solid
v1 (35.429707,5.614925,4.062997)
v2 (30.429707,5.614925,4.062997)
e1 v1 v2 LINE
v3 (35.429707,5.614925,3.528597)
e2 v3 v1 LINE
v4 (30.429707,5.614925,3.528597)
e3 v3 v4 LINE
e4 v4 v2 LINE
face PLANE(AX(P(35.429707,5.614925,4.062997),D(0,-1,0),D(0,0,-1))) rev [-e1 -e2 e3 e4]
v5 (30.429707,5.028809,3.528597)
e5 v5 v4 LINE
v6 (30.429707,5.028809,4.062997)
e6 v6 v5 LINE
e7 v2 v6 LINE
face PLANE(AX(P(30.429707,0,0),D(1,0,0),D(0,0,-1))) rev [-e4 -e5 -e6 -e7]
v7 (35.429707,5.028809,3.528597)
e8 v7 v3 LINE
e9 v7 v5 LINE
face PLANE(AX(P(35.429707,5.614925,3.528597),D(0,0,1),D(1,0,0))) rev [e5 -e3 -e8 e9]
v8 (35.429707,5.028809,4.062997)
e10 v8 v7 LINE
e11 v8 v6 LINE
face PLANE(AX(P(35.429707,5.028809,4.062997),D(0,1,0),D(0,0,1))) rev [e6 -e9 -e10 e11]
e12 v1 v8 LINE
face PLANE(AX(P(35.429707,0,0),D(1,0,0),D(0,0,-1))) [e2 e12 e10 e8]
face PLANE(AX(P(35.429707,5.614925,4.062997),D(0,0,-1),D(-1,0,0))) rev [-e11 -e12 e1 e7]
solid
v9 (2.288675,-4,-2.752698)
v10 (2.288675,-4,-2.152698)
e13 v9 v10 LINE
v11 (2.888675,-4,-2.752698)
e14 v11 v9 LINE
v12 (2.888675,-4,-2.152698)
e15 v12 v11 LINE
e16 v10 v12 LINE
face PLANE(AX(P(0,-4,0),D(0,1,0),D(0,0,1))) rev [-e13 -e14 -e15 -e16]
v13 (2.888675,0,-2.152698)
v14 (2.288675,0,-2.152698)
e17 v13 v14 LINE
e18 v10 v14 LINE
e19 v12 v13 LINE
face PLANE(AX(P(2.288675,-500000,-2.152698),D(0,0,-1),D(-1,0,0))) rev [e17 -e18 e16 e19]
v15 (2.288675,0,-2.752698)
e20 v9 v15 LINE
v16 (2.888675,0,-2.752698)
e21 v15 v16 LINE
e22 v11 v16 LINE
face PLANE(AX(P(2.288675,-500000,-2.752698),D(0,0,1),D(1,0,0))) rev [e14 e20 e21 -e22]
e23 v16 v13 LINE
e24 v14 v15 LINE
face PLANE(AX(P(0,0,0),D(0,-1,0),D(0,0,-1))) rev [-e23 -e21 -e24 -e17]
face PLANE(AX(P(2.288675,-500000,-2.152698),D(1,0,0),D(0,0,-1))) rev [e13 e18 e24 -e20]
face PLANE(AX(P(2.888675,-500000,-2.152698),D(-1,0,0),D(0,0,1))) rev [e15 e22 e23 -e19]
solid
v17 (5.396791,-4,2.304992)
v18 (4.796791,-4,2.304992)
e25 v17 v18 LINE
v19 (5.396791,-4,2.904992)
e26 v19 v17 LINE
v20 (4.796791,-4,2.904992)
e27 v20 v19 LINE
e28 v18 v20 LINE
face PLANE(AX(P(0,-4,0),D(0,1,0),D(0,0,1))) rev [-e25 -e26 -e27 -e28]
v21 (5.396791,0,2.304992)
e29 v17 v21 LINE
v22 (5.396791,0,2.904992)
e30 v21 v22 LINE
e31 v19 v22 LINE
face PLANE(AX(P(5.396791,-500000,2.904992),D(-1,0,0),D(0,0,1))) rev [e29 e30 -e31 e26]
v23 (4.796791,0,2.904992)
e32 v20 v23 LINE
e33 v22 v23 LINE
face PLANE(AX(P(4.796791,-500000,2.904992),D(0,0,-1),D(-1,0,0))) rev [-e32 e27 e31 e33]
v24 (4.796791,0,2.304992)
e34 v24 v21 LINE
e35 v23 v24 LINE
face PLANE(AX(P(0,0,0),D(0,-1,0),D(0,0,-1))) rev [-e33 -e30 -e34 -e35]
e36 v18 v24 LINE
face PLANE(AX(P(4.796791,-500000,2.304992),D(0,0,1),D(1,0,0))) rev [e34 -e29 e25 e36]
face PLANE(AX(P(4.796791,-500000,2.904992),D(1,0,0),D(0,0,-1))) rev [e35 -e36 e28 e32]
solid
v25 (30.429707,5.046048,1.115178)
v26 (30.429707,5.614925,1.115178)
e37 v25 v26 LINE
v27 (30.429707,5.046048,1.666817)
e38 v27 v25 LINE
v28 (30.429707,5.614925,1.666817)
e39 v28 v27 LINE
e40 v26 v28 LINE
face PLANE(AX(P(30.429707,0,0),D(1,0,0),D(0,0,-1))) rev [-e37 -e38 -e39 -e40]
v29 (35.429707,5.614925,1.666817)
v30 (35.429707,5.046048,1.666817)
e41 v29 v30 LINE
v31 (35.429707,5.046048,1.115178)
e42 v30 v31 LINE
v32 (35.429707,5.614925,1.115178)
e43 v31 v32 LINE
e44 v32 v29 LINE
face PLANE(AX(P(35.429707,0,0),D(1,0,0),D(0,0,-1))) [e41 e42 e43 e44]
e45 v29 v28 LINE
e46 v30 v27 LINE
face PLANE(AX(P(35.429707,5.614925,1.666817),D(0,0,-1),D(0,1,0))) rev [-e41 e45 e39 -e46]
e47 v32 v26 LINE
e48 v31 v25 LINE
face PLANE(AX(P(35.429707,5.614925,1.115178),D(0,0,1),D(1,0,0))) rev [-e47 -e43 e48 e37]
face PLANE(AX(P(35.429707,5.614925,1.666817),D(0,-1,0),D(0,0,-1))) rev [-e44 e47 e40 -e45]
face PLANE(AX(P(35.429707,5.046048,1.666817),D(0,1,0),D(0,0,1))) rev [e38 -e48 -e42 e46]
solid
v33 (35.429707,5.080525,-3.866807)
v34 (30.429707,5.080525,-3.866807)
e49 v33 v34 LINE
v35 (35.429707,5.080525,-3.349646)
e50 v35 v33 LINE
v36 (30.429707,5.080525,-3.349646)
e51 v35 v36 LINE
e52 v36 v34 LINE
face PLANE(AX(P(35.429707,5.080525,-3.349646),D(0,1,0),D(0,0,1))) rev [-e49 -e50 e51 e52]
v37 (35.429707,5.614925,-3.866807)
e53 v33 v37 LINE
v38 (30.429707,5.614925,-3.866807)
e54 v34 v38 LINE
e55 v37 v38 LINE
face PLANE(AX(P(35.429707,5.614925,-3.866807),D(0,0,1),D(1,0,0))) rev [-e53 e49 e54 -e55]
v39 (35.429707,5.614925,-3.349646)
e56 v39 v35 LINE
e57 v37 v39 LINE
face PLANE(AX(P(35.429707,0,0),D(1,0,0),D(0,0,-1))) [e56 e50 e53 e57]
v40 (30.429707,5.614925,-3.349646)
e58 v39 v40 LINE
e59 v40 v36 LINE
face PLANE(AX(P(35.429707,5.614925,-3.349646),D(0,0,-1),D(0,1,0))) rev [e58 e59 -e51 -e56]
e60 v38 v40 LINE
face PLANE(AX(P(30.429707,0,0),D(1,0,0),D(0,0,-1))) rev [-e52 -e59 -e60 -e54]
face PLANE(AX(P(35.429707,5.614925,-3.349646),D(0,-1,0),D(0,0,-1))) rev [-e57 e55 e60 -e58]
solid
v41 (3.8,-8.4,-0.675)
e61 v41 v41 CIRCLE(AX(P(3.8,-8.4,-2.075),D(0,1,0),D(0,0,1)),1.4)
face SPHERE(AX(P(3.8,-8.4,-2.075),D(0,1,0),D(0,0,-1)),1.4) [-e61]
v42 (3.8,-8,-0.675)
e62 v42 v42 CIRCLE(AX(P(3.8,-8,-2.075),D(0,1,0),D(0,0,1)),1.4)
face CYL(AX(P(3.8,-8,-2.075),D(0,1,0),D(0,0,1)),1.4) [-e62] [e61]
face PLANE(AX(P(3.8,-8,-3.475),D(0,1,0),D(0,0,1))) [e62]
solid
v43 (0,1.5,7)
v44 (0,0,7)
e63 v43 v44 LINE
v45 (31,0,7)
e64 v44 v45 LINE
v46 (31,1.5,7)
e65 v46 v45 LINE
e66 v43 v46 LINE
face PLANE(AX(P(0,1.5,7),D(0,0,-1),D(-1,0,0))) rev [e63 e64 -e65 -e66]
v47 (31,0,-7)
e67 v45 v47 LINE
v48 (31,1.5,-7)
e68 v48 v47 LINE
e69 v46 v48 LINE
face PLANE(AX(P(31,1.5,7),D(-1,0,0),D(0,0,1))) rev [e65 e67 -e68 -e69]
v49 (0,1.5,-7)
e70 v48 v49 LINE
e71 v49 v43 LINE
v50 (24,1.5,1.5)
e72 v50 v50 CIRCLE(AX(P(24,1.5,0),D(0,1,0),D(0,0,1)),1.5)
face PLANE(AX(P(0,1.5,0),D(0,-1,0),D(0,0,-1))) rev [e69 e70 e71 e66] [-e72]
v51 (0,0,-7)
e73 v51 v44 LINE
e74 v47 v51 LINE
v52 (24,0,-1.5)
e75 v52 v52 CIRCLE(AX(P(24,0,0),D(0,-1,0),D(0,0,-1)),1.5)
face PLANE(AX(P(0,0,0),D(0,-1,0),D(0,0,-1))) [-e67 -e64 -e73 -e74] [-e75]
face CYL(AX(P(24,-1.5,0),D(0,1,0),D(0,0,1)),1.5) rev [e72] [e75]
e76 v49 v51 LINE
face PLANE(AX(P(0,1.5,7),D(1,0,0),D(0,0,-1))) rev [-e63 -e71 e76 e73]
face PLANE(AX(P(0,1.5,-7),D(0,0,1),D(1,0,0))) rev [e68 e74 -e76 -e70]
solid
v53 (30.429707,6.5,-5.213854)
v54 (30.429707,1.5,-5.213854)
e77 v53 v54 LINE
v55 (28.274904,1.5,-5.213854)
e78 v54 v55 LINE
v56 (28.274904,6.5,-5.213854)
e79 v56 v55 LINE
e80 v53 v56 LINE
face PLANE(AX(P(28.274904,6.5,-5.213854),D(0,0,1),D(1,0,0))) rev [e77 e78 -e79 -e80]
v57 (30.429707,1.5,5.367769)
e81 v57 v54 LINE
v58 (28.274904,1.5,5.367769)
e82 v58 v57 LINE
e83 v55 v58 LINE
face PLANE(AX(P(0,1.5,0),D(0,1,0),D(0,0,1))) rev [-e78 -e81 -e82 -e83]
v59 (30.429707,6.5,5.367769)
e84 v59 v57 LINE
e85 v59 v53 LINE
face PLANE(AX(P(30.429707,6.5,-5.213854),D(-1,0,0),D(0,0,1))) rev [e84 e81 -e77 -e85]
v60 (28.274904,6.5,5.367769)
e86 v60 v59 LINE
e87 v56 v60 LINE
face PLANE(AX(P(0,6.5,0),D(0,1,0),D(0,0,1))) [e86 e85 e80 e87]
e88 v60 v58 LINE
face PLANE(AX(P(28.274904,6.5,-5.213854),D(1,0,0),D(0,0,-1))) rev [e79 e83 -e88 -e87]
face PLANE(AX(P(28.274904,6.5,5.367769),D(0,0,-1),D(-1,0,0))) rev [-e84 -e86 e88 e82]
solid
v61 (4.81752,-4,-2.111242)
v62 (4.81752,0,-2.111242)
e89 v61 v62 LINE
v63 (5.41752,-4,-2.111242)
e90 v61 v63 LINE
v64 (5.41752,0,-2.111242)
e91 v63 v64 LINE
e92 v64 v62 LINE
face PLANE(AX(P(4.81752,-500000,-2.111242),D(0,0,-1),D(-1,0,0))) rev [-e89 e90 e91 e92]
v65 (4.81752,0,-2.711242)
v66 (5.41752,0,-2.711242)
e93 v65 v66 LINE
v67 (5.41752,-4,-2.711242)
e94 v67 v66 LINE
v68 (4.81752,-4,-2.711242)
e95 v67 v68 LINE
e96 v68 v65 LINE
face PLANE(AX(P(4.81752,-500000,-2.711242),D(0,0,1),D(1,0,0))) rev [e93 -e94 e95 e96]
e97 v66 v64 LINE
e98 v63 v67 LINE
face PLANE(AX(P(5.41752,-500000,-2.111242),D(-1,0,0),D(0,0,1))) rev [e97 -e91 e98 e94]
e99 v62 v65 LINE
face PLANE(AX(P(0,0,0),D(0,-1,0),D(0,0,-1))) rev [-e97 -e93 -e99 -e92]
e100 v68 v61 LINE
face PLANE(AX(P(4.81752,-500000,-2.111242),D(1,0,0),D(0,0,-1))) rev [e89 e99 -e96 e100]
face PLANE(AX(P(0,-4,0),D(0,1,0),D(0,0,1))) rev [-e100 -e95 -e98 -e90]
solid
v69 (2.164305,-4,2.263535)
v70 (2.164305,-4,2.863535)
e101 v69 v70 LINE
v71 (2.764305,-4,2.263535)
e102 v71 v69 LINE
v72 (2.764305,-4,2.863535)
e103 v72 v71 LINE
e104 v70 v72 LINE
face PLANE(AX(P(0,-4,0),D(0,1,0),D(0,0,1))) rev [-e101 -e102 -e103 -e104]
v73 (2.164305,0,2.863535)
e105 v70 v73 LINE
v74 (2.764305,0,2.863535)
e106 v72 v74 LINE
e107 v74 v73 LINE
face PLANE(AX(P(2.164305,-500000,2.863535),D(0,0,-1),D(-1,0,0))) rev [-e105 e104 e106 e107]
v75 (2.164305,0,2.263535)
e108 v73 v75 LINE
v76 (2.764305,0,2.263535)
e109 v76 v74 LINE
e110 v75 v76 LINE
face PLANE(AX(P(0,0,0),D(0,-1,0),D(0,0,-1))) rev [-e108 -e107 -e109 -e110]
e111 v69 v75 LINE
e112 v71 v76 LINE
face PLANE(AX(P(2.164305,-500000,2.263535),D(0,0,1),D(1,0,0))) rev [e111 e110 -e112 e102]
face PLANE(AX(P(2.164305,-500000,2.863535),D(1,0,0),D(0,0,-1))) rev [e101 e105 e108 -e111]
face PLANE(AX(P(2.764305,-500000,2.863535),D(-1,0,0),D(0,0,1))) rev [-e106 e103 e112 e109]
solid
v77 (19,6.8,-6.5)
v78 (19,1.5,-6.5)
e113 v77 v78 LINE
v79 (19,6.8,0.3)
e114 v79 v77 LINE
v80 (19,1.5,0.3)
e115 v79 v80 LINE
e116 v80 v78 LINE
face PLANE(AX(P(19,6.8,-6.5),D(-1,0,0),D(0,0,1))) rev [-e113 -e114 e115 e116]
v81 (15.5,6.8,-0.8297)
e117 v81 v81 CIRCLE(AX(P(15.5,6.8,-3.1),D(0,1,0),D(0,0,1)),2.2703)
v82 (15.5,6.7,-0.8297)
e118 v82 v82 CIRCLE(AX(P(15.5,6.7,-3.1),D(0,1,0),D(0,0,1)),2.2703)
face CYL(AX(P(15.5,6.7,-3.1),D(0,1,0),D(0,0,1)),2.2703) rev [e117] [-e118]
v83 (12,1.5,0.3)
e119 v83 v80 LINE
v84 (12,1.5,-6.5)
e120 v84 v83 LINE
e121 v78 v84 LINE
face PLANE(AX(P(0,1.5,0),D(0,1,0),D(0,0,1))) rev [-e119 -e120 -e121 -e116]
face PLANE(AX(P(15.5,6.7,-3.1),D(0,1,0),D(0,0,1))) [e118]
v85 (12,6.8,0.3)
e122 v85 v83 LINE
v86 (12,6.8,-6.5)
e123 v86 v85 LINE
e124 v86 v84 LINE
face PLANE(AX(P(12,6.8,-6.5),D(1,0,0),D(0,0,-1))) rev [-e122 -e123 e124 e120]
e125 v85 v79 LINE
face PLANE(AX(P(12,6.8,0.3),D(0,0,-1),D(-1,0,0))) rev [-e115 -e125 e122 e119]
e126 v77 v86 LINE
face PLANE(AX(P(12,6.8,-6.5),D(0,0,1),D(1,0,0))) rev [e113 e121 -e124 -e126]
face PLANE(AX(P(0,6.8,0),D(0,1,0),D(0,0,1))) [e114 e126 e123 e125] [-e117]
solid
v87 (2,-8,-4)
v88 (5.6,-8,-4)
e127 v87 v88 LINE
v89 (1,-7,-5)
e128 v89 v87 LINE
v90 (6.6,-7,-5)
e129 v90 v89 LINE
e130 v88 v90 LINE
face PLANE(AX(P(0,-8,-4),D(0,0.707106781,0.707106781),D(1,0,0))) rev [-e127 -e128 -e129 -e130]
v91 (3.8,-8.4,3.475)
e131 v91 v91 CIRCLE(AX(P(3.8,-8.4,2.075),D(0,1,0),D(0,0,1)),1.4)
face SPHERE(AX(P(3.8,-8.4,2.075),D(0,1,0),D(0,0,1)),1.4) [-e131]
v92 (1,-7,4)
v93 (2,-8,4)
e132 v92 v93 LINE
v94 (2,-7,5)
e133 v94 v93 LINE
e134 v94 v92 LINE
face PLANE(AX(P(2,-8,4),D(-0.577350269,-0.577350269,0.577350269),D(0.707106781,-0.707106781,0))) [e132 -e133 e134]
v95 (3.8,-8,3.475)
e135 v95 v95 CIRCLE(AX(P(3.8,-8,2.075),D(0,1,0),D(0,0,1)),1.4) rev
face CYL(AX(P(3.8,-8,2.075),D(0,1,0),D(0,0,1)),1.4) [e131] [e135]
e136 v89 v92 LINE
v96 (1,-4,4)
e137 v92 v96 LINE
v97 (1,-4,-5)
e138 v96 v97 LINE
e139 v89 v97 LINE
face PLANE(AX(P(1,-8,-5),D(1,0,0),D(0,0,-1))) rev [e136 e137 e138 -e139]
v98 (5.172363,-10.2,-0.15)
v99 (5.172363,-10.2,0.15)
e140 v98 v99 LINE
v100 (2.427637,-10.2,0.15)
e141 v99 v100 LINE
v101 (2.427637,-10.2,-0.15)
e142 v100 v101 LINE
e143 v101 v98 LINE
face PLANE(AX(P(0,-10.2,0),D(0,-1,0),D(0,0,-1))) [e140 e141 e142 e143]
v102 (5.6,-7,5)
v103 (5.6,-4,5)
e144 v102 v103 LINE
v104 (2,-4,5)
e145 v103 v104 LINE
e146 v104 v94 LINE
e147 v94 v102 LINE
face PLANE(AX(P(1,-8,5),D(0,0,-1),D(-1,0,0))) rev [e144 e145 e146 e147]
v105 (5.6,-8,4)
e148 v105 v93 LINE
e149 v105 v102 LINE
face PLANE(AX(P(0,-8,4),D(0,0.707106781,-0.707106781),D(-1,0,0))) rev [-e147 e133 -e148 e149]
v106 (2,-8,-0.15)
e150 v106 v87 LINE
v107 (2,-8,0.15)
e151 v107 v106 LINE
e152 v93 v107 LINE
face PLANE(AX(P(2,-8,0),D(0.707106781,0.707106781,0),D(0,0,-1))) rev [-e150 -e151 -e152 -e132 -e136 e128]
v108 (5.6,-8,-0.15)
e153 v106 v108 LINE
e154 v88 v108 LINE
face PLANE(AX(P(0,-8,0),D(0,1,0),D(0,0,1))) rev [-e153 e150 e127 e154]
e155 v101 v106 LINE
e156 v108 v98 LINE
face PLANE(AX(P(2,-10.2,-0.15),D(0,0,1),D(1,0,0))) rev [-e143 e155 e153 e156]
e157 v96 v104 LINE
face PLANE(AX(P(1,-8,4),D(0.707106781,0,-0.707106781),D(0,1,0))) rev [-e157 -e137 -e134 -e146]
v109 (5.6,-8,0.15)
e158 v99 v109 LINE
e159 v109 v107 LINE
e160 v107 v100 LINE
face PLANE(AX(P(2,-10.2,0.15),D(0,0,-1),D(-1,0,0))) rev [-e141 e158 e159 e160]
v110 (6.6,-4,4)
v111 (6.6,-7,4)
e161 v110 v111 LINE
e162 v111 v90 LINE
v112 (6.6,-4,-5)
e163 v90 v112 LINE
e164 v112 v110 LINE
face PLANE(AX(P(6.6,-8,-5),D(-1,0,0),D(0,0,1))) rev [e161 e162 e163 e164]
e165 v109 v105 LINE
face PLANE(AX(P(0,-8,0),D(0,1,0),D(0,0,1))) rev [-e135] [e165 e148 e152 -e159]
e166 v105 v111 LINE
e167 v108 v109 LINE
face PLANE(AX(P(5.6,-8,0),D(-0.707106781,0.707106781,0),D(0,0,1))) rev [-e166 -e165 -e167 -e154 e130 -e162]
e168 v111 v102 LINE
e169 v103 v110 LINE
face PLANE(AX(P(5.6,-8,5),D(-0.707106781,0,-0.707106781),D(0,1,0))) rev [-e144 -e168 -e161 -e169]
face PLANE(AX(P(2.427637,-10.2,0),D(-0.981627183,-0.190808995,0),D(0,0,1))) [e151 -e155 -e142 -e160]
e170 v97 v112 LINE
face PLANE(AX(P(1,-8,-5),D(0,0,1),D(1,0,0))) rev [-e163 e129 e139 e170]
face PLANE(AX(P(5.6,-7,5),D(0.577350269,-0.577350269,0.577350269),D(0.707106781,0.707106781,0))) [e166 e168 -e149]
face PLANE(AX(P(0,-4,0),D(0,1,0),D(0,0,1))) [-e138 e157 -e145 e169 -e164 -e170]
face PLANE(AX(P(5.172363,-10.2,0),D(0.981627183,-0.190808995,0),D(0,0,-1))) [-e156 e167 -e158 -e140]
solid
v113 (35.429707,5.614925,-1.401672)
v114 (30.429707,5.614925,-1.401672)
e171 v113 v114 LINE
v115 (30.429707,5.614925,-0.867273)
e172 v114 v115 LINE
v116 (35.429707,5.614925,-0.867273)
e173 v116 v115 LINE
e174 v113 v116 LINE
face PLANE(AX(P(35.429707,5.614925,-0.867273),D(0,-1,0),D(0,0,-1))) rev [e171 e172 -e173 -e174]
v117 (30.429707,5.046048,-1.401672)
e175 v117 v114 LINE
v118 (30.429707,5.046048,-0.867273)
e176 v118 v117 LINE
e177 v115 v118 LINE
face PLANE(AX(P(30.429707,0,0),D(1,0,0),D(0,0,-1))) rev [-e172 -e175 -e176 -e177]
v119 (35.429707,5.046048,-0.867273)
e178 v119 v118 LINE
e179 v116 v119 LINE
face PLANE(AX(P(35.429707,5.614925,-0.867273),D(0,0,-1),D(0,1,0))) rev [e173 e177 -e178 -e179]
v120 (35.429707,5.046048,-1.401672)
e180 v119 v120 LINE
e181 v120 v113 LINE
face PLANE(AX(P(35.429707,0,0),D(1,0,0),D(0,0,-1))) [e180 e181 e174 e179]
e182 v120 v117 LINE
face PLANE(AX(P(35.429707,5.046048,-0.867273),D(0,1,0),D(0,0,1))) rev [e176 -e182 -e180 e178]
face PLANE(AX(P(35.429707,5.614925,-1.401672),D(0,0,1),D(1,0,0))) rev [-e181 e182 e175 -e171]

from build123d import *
from OCP.BRepFilletAPI import BRepFilletAPI_MakeChamfer

# Parameters (mm, degrees)
SKETCH_1_W          = 31
SKETCH_1_H          = 14
EXTRUDE_1_DEPTH     = 1.5
SKETCH_2_W          = 7
SKETCH_2_H          = 6.8
EXTRUDE_2_DEPTH     = 5.3
SKETCH_3_W          = 2.154803144
SKETCH_3_H          = 10.581622582
EXTRUDE_3_DEPTH     = 5
SKETCH_5_W          = 0.534399799
SKETCH_5_H          = 0.586115909
EXTRUDE_4_DEPTH     = 5
SKETCH_5_W_2        = 0.551638502
SKETCH_5_H_2        = 0.568877205
EXTRUDE_4_2_DEPTH   = 5
EXTRUDE_4_3_DEPTH   = 5
SKETCH_5_W_3        = 0.517161096
SKETCH_5_H_3        = 0.534399799
EXTRUDE_4_4_DEPTH   = 5
EXTRUDE_START       = 4
SKETCH_6_W          = 5.6
SKETCH_6_H          = 10
EXTRUDE_5_DEPTH     = 4
EXTRUDE_6_REACH     = 38.99
SKETCH_7_W          = 0.6
SKETCH_7_H          = 0.6
CHAMFER_1_SIZE      = 1
SKETCH_8_R          = 1.5
CUT_EXTRUDE_1_DEPTH = 3
SKETCH_9_W          = 3.6
SKETCH_9_H          = 0.3
EXTRUDE_7_DEPTH     = 2.2
CHAMFER_2_SIZE      = 2.2
CHAMFER_2_SIZE_2    = 0.42763668
SKETCH_12_R         = 2.270300466
CUT_EXTRUDE_2_DEPTH = 0.1


with BuildPart() as part:
    # 草圖1 → 填料-伸長1 (new body)
    with BuildSketch(Plane(origin=(0, 0, 0), x_dir=(1, 0, 0), z_dir=(0, 1, 0))):
        with Locations((15.5, 0)):
            Rectangle(SKETCH_1_W, SKETCH_1_H)
    extrude(amount=EXTRUDE_1_DEPTH)

    # 草圖8 → 除料-伸長1 (cut)
    with BuildSketch(Plane(origin=(0, 1.5, 0), x_dir=(1, 0, 0), z_dir=(0, 1, 0))):
        with Locations(Location((24, 0, 0), (0, 0, 270))):
            Circle(SKETCH_8_R)
    extrude(amount=-CUT_EXTRUDE_1_DEPTH, mode=Mode.SUBTRACT)


with BuildPart() as body_2:
    # 草圖2 → 填料-伸長2 (new body)
    with BuildSketch(Plane(origin=(0, 1.5, 0), x_dir=(1, 0, 0), z_dir=(0, 1, 0))):
        with Locations((15.5, 3.1)):
            Rectangle(SKETCH_2_W, SKETCH_2_H)
    extrude(amount=EXTRUDE_2_DEPTH)

    # 草圖12 → 除料-伸長2 (cut)
    with BuildSketch(Plane(origin=(0, 6.8, 0), x_dir=(1, 0, 0), z_dir=(0, 1, 0))):
        with Locations(Location((15.5, 3.1, 0), (0, 0, 270))):
            Circle(SKETCH_12_R)
    extrude(amount=-CUT_EXTRUDE_2_DEPTH, mode=Mode.SUBTRACT)


with BuildPart() as body_3:
    # 草圖3 → 填料-伸長3 (new body)
    with BuildSketch(Plane(origin=(0, 1.5, 0), x_dir=(1, 0, 0), z_dir=(0, 1, 0))):
        with Locations((29.352305926, -0.076957255)):
            Rectangle(SKETCH_3_W, SKETCH_3_H)
    extrude(amount=EXTRUDE_3_DEPTH)


with BuildPart() as body_4:
    # 草圖5 → 填料-伸長4 (new body)
    with BuildSketch(Plane(origin=(30.429707498, 0, 0), x_dir=(0, 0, -1), z_dir=(1, 0, 0))):
        with Locations((-3.795796662, 5.3218671)):
            Rectangle(SKETCH_5_W, SKETCH_5_H)
    extrude(amount=EXTRUDE_4_DEPTH)


with BuildPart() as body_5:
    # 草圖5 → Extrude 4 2 (new body)
    with BuildSketch(Plane(origin=(30.429707498, 0, 0), x_dir=(0, 0, -1), z_dir=(1, 0, 0))):
        with Locations((-1.390997567, 5.330486452)):
            Rectangle(SKETCH_5_W_2, SKETCH_5_H_2)
    extrude(amount=EXTRUDE_4_2_DEPTH)


with BuildPart() as body_6:
    # 草圖5 → Extrude 4 3 (new body)
    with BuildSketch(Plane(origin=(30.429707498, 0, 0), x_dir=(0, 0, -1), z_dir=(1, 0, 0))):
        with Locations((1.134472451, 5.330486452)):
            Rectangle(SKETCH_5_W, SKETCH_5_H_2)
    extrude(amount=EXTRUDE_4_3_DEPTH)


with BuildPart() as body_7:
    # 草圖5 → Extrude 4 4 (new body)
    with BuildSketch(Plane(origin=(30.429707498, 0, 0), x_dir=(0, 0, -1), z_dir=(1, 0, 0))):
        with Locations((3.608226359, 5.347725155)):
            Rectangle(SKETCH_5_W_3, SKETCH_5_H_3)
    extrude(amount=EXTRUDE_4_4_DEPTH)


with BuildPart() as body_8:
    # 草圖6 → 填料-伸長5 (new body)
    with BuildSketch(Plane.XZ.offset(EXTRUDE_START)):
        with Locations((3.8, 0)):
            Rectangle(SKETCH_6_W, SKETCH_6_H)
    extrude(amount=EXTRUDE_5_DEPTH)


with BuildPart() as body_9:

    # 草圖7 → 填料-伸長6 (new, up to next)
    with BuildSketch(Plane.XZ, mode=Mode.PRIVATE) as extrude_6_sk1:
        with Locations((2.464305344, 2.563535255)):
            Rectangle(SKETCH_7_W, SKETCH_7_H)
    extrude_6_tool1 = extrude(extrude_6_sk1.sketch, amount=EXTRUDE_6_REACH, mode=Mode.PRIVATE) - body_8.part
    # 草圖7 → 填料-伸長6 (new, up to next)
    with BuildSketch(Plane.XZ, mode=Mode.PRIVATE) as extrude_6_sk2:
        with Locations((5.096791463, 2.604991729)):
            Rectangle(SKETCH_7_W, SKETCH_7_H)
    extrude_6_tool2 = extrude(extrude_6_sk2.sketch, amount=EXTRUDE_6_REACH, mode=Mode.PRIVATE) - body_8.part
    # 草圖7 → 填料-伸長6 (new, up to next)
    with BuildSketch(Plane.XZ, mode=Mode.PRIVATE) as extrude_6_sk3:
        with Locations((2.588674767, -2.452698138)):
            Rectangle(SKETCH_7_W, SKETCH_7_H)
    extrude_6_tool3 = extrude(extrude_6_sk3.sketch, amount=EXTRUDE_6_REACH, mode=Mode.PRIVATE) - body_8.part
    # 草圖7 → 填料-伸長6 (new, up to next)
    with BuildSketch(Plane.XZ, mode=Mode.PRIVATE) as extrude_6_sk4:
        with Locations((5.1175197, -2.411241663)):
            Rectangle(SKETCH_7_W, SKETCH_7_H)
    extrude_6_tool4 = extrude(extrude_6_sk4.sketch, amount=EXTRUDE_6_REACH, mode=Mode.PRIVATE) - body_8.part
    add(extrude_6_tool1.solids().sort_by_distance((2.464305, 0, 2.563535))[0])
    add(extrude_6_tool2.solids().sort_by_distance((5.096791, 0, 2.604992))[0])
    add(extrude_6_tool3.solids().sort_by_distance((2.588675, 0, -2.452698))[0])
    add(extrude_6_tool4.solids().sort_by_distance((5.11752, 0, -2.411242))[0])


with BuildPart() as body_8_1:
    add(body_8.part)

    # 導角1
    chamfer_1_edges = [body_8_1.edges().sort_by_distance(p)[0] for p in [
        (6.6, -8, 0),
        (3.8, -8, 5),
        (1, -8, 0),
        (3.8, -8, -5),
        (1, -6, 5),
        (6.6, -6, 5),
    ]]
    chamfer(chamfer_1_edges, length=CHAMFER_1_SIZE)

    # 草圖9 → 填料-伸長7 (add)
    with BuildSketch(Plane.XZ.offset(8)):
        with Locations((3.8, 0)):
            Rectangle(SKETCH_9_W, SKETCH_9_H)
    extrude(amount=EXTRUDE_7_DEPTH)

    # 導角2
    chamfer_2_edges_1 = [body_8_1.edges().sort_by_distance(p)[0] for p in [
        (5.6, -10.2, 0),
    ]]
    chamfer_2_side_1 = [body_8_1.faces().sort_by_distance(p)[0] for p in [
        (5.6, -10.191447266, 0),
    ]]
    chamfer_2_edges_2 = [body_8_1.edges().sort_by_distance(p)[0] for p in [
        (2, -10.2, 0),
    ]]
    chamfer_2_side_2 = [body_8_1.faces().sort_by_distance(p)[0] for p in [
        (2, -10.191447266, 0),
    ]]
    chamfer_2 = BRepFilletAPI_MakeChamfer(body_8_1.part.solid().wrapped)
    for e in chamfer_2_edges_1:
        chamfer_2.Add(CHAMFER_2_SIZE - 0.0001, CHAMFER_2_SIZE_2 - 0.0001, e.wrapped, chamfer_2_side_1[0].wrapped)
    for e in chamfer_2_edges_2:
        chamfer_2.Add(CHAMFER_2_SIZE - 0.0001, CHAMFER_2_SIZE_2 - 0.0001, e.wrapped, chamfer_2_side_2[0].wrapped)
    add(Compound.cast(chamfer_2.Shape()), mode=Mode.REPLACE)  # a hair under: the kernel refuses the full size

    # 草圖11 → 旋轉2 (revolve)
    with BuildSketch(Plane.ZY.offset(-3.8)):
        with BuildLine():
            Line((2.075, -8), (2.075, -9.8))
            ThreePointArc((2.075, -9.8), (3.064949494, -9.389949494), (3.475, -8.4))
            Line((3.475, -8.4), (3.475, -8))
            Line((3.475, -8), (2.075, -8))
        make_face()
    revolve(axis=Axis((3.8, -8, 2.075), (0, -1, 0)))


with BuildPart() as body_10:
    # 草圖10 → 旋轉1 (revolve)
    with BuildSketch(Plane.ZY.offset(-3.8)):
        with BuildLine():
            Line((-2.075, -8), (-2.075, -9.8))
            ThreePointArc((-2.075, -9.8), (-3.064949494, -9.389949494), (-3.475, -8.4))
            Line((-3.475, -8.4), (-3.475, -8))
            Line((-3.475, -8), (-2.075, -8))
        make_face()
    revolve(axis=Axis((3.8, -8, -2.075), (0, -1, 0)))


solid = Compound([part.part, body_2.part, body_3.part, body_4.part, body_5.part, body_6.part, body_7.part, body_9.part, body_8_1.part, body_10.part])
